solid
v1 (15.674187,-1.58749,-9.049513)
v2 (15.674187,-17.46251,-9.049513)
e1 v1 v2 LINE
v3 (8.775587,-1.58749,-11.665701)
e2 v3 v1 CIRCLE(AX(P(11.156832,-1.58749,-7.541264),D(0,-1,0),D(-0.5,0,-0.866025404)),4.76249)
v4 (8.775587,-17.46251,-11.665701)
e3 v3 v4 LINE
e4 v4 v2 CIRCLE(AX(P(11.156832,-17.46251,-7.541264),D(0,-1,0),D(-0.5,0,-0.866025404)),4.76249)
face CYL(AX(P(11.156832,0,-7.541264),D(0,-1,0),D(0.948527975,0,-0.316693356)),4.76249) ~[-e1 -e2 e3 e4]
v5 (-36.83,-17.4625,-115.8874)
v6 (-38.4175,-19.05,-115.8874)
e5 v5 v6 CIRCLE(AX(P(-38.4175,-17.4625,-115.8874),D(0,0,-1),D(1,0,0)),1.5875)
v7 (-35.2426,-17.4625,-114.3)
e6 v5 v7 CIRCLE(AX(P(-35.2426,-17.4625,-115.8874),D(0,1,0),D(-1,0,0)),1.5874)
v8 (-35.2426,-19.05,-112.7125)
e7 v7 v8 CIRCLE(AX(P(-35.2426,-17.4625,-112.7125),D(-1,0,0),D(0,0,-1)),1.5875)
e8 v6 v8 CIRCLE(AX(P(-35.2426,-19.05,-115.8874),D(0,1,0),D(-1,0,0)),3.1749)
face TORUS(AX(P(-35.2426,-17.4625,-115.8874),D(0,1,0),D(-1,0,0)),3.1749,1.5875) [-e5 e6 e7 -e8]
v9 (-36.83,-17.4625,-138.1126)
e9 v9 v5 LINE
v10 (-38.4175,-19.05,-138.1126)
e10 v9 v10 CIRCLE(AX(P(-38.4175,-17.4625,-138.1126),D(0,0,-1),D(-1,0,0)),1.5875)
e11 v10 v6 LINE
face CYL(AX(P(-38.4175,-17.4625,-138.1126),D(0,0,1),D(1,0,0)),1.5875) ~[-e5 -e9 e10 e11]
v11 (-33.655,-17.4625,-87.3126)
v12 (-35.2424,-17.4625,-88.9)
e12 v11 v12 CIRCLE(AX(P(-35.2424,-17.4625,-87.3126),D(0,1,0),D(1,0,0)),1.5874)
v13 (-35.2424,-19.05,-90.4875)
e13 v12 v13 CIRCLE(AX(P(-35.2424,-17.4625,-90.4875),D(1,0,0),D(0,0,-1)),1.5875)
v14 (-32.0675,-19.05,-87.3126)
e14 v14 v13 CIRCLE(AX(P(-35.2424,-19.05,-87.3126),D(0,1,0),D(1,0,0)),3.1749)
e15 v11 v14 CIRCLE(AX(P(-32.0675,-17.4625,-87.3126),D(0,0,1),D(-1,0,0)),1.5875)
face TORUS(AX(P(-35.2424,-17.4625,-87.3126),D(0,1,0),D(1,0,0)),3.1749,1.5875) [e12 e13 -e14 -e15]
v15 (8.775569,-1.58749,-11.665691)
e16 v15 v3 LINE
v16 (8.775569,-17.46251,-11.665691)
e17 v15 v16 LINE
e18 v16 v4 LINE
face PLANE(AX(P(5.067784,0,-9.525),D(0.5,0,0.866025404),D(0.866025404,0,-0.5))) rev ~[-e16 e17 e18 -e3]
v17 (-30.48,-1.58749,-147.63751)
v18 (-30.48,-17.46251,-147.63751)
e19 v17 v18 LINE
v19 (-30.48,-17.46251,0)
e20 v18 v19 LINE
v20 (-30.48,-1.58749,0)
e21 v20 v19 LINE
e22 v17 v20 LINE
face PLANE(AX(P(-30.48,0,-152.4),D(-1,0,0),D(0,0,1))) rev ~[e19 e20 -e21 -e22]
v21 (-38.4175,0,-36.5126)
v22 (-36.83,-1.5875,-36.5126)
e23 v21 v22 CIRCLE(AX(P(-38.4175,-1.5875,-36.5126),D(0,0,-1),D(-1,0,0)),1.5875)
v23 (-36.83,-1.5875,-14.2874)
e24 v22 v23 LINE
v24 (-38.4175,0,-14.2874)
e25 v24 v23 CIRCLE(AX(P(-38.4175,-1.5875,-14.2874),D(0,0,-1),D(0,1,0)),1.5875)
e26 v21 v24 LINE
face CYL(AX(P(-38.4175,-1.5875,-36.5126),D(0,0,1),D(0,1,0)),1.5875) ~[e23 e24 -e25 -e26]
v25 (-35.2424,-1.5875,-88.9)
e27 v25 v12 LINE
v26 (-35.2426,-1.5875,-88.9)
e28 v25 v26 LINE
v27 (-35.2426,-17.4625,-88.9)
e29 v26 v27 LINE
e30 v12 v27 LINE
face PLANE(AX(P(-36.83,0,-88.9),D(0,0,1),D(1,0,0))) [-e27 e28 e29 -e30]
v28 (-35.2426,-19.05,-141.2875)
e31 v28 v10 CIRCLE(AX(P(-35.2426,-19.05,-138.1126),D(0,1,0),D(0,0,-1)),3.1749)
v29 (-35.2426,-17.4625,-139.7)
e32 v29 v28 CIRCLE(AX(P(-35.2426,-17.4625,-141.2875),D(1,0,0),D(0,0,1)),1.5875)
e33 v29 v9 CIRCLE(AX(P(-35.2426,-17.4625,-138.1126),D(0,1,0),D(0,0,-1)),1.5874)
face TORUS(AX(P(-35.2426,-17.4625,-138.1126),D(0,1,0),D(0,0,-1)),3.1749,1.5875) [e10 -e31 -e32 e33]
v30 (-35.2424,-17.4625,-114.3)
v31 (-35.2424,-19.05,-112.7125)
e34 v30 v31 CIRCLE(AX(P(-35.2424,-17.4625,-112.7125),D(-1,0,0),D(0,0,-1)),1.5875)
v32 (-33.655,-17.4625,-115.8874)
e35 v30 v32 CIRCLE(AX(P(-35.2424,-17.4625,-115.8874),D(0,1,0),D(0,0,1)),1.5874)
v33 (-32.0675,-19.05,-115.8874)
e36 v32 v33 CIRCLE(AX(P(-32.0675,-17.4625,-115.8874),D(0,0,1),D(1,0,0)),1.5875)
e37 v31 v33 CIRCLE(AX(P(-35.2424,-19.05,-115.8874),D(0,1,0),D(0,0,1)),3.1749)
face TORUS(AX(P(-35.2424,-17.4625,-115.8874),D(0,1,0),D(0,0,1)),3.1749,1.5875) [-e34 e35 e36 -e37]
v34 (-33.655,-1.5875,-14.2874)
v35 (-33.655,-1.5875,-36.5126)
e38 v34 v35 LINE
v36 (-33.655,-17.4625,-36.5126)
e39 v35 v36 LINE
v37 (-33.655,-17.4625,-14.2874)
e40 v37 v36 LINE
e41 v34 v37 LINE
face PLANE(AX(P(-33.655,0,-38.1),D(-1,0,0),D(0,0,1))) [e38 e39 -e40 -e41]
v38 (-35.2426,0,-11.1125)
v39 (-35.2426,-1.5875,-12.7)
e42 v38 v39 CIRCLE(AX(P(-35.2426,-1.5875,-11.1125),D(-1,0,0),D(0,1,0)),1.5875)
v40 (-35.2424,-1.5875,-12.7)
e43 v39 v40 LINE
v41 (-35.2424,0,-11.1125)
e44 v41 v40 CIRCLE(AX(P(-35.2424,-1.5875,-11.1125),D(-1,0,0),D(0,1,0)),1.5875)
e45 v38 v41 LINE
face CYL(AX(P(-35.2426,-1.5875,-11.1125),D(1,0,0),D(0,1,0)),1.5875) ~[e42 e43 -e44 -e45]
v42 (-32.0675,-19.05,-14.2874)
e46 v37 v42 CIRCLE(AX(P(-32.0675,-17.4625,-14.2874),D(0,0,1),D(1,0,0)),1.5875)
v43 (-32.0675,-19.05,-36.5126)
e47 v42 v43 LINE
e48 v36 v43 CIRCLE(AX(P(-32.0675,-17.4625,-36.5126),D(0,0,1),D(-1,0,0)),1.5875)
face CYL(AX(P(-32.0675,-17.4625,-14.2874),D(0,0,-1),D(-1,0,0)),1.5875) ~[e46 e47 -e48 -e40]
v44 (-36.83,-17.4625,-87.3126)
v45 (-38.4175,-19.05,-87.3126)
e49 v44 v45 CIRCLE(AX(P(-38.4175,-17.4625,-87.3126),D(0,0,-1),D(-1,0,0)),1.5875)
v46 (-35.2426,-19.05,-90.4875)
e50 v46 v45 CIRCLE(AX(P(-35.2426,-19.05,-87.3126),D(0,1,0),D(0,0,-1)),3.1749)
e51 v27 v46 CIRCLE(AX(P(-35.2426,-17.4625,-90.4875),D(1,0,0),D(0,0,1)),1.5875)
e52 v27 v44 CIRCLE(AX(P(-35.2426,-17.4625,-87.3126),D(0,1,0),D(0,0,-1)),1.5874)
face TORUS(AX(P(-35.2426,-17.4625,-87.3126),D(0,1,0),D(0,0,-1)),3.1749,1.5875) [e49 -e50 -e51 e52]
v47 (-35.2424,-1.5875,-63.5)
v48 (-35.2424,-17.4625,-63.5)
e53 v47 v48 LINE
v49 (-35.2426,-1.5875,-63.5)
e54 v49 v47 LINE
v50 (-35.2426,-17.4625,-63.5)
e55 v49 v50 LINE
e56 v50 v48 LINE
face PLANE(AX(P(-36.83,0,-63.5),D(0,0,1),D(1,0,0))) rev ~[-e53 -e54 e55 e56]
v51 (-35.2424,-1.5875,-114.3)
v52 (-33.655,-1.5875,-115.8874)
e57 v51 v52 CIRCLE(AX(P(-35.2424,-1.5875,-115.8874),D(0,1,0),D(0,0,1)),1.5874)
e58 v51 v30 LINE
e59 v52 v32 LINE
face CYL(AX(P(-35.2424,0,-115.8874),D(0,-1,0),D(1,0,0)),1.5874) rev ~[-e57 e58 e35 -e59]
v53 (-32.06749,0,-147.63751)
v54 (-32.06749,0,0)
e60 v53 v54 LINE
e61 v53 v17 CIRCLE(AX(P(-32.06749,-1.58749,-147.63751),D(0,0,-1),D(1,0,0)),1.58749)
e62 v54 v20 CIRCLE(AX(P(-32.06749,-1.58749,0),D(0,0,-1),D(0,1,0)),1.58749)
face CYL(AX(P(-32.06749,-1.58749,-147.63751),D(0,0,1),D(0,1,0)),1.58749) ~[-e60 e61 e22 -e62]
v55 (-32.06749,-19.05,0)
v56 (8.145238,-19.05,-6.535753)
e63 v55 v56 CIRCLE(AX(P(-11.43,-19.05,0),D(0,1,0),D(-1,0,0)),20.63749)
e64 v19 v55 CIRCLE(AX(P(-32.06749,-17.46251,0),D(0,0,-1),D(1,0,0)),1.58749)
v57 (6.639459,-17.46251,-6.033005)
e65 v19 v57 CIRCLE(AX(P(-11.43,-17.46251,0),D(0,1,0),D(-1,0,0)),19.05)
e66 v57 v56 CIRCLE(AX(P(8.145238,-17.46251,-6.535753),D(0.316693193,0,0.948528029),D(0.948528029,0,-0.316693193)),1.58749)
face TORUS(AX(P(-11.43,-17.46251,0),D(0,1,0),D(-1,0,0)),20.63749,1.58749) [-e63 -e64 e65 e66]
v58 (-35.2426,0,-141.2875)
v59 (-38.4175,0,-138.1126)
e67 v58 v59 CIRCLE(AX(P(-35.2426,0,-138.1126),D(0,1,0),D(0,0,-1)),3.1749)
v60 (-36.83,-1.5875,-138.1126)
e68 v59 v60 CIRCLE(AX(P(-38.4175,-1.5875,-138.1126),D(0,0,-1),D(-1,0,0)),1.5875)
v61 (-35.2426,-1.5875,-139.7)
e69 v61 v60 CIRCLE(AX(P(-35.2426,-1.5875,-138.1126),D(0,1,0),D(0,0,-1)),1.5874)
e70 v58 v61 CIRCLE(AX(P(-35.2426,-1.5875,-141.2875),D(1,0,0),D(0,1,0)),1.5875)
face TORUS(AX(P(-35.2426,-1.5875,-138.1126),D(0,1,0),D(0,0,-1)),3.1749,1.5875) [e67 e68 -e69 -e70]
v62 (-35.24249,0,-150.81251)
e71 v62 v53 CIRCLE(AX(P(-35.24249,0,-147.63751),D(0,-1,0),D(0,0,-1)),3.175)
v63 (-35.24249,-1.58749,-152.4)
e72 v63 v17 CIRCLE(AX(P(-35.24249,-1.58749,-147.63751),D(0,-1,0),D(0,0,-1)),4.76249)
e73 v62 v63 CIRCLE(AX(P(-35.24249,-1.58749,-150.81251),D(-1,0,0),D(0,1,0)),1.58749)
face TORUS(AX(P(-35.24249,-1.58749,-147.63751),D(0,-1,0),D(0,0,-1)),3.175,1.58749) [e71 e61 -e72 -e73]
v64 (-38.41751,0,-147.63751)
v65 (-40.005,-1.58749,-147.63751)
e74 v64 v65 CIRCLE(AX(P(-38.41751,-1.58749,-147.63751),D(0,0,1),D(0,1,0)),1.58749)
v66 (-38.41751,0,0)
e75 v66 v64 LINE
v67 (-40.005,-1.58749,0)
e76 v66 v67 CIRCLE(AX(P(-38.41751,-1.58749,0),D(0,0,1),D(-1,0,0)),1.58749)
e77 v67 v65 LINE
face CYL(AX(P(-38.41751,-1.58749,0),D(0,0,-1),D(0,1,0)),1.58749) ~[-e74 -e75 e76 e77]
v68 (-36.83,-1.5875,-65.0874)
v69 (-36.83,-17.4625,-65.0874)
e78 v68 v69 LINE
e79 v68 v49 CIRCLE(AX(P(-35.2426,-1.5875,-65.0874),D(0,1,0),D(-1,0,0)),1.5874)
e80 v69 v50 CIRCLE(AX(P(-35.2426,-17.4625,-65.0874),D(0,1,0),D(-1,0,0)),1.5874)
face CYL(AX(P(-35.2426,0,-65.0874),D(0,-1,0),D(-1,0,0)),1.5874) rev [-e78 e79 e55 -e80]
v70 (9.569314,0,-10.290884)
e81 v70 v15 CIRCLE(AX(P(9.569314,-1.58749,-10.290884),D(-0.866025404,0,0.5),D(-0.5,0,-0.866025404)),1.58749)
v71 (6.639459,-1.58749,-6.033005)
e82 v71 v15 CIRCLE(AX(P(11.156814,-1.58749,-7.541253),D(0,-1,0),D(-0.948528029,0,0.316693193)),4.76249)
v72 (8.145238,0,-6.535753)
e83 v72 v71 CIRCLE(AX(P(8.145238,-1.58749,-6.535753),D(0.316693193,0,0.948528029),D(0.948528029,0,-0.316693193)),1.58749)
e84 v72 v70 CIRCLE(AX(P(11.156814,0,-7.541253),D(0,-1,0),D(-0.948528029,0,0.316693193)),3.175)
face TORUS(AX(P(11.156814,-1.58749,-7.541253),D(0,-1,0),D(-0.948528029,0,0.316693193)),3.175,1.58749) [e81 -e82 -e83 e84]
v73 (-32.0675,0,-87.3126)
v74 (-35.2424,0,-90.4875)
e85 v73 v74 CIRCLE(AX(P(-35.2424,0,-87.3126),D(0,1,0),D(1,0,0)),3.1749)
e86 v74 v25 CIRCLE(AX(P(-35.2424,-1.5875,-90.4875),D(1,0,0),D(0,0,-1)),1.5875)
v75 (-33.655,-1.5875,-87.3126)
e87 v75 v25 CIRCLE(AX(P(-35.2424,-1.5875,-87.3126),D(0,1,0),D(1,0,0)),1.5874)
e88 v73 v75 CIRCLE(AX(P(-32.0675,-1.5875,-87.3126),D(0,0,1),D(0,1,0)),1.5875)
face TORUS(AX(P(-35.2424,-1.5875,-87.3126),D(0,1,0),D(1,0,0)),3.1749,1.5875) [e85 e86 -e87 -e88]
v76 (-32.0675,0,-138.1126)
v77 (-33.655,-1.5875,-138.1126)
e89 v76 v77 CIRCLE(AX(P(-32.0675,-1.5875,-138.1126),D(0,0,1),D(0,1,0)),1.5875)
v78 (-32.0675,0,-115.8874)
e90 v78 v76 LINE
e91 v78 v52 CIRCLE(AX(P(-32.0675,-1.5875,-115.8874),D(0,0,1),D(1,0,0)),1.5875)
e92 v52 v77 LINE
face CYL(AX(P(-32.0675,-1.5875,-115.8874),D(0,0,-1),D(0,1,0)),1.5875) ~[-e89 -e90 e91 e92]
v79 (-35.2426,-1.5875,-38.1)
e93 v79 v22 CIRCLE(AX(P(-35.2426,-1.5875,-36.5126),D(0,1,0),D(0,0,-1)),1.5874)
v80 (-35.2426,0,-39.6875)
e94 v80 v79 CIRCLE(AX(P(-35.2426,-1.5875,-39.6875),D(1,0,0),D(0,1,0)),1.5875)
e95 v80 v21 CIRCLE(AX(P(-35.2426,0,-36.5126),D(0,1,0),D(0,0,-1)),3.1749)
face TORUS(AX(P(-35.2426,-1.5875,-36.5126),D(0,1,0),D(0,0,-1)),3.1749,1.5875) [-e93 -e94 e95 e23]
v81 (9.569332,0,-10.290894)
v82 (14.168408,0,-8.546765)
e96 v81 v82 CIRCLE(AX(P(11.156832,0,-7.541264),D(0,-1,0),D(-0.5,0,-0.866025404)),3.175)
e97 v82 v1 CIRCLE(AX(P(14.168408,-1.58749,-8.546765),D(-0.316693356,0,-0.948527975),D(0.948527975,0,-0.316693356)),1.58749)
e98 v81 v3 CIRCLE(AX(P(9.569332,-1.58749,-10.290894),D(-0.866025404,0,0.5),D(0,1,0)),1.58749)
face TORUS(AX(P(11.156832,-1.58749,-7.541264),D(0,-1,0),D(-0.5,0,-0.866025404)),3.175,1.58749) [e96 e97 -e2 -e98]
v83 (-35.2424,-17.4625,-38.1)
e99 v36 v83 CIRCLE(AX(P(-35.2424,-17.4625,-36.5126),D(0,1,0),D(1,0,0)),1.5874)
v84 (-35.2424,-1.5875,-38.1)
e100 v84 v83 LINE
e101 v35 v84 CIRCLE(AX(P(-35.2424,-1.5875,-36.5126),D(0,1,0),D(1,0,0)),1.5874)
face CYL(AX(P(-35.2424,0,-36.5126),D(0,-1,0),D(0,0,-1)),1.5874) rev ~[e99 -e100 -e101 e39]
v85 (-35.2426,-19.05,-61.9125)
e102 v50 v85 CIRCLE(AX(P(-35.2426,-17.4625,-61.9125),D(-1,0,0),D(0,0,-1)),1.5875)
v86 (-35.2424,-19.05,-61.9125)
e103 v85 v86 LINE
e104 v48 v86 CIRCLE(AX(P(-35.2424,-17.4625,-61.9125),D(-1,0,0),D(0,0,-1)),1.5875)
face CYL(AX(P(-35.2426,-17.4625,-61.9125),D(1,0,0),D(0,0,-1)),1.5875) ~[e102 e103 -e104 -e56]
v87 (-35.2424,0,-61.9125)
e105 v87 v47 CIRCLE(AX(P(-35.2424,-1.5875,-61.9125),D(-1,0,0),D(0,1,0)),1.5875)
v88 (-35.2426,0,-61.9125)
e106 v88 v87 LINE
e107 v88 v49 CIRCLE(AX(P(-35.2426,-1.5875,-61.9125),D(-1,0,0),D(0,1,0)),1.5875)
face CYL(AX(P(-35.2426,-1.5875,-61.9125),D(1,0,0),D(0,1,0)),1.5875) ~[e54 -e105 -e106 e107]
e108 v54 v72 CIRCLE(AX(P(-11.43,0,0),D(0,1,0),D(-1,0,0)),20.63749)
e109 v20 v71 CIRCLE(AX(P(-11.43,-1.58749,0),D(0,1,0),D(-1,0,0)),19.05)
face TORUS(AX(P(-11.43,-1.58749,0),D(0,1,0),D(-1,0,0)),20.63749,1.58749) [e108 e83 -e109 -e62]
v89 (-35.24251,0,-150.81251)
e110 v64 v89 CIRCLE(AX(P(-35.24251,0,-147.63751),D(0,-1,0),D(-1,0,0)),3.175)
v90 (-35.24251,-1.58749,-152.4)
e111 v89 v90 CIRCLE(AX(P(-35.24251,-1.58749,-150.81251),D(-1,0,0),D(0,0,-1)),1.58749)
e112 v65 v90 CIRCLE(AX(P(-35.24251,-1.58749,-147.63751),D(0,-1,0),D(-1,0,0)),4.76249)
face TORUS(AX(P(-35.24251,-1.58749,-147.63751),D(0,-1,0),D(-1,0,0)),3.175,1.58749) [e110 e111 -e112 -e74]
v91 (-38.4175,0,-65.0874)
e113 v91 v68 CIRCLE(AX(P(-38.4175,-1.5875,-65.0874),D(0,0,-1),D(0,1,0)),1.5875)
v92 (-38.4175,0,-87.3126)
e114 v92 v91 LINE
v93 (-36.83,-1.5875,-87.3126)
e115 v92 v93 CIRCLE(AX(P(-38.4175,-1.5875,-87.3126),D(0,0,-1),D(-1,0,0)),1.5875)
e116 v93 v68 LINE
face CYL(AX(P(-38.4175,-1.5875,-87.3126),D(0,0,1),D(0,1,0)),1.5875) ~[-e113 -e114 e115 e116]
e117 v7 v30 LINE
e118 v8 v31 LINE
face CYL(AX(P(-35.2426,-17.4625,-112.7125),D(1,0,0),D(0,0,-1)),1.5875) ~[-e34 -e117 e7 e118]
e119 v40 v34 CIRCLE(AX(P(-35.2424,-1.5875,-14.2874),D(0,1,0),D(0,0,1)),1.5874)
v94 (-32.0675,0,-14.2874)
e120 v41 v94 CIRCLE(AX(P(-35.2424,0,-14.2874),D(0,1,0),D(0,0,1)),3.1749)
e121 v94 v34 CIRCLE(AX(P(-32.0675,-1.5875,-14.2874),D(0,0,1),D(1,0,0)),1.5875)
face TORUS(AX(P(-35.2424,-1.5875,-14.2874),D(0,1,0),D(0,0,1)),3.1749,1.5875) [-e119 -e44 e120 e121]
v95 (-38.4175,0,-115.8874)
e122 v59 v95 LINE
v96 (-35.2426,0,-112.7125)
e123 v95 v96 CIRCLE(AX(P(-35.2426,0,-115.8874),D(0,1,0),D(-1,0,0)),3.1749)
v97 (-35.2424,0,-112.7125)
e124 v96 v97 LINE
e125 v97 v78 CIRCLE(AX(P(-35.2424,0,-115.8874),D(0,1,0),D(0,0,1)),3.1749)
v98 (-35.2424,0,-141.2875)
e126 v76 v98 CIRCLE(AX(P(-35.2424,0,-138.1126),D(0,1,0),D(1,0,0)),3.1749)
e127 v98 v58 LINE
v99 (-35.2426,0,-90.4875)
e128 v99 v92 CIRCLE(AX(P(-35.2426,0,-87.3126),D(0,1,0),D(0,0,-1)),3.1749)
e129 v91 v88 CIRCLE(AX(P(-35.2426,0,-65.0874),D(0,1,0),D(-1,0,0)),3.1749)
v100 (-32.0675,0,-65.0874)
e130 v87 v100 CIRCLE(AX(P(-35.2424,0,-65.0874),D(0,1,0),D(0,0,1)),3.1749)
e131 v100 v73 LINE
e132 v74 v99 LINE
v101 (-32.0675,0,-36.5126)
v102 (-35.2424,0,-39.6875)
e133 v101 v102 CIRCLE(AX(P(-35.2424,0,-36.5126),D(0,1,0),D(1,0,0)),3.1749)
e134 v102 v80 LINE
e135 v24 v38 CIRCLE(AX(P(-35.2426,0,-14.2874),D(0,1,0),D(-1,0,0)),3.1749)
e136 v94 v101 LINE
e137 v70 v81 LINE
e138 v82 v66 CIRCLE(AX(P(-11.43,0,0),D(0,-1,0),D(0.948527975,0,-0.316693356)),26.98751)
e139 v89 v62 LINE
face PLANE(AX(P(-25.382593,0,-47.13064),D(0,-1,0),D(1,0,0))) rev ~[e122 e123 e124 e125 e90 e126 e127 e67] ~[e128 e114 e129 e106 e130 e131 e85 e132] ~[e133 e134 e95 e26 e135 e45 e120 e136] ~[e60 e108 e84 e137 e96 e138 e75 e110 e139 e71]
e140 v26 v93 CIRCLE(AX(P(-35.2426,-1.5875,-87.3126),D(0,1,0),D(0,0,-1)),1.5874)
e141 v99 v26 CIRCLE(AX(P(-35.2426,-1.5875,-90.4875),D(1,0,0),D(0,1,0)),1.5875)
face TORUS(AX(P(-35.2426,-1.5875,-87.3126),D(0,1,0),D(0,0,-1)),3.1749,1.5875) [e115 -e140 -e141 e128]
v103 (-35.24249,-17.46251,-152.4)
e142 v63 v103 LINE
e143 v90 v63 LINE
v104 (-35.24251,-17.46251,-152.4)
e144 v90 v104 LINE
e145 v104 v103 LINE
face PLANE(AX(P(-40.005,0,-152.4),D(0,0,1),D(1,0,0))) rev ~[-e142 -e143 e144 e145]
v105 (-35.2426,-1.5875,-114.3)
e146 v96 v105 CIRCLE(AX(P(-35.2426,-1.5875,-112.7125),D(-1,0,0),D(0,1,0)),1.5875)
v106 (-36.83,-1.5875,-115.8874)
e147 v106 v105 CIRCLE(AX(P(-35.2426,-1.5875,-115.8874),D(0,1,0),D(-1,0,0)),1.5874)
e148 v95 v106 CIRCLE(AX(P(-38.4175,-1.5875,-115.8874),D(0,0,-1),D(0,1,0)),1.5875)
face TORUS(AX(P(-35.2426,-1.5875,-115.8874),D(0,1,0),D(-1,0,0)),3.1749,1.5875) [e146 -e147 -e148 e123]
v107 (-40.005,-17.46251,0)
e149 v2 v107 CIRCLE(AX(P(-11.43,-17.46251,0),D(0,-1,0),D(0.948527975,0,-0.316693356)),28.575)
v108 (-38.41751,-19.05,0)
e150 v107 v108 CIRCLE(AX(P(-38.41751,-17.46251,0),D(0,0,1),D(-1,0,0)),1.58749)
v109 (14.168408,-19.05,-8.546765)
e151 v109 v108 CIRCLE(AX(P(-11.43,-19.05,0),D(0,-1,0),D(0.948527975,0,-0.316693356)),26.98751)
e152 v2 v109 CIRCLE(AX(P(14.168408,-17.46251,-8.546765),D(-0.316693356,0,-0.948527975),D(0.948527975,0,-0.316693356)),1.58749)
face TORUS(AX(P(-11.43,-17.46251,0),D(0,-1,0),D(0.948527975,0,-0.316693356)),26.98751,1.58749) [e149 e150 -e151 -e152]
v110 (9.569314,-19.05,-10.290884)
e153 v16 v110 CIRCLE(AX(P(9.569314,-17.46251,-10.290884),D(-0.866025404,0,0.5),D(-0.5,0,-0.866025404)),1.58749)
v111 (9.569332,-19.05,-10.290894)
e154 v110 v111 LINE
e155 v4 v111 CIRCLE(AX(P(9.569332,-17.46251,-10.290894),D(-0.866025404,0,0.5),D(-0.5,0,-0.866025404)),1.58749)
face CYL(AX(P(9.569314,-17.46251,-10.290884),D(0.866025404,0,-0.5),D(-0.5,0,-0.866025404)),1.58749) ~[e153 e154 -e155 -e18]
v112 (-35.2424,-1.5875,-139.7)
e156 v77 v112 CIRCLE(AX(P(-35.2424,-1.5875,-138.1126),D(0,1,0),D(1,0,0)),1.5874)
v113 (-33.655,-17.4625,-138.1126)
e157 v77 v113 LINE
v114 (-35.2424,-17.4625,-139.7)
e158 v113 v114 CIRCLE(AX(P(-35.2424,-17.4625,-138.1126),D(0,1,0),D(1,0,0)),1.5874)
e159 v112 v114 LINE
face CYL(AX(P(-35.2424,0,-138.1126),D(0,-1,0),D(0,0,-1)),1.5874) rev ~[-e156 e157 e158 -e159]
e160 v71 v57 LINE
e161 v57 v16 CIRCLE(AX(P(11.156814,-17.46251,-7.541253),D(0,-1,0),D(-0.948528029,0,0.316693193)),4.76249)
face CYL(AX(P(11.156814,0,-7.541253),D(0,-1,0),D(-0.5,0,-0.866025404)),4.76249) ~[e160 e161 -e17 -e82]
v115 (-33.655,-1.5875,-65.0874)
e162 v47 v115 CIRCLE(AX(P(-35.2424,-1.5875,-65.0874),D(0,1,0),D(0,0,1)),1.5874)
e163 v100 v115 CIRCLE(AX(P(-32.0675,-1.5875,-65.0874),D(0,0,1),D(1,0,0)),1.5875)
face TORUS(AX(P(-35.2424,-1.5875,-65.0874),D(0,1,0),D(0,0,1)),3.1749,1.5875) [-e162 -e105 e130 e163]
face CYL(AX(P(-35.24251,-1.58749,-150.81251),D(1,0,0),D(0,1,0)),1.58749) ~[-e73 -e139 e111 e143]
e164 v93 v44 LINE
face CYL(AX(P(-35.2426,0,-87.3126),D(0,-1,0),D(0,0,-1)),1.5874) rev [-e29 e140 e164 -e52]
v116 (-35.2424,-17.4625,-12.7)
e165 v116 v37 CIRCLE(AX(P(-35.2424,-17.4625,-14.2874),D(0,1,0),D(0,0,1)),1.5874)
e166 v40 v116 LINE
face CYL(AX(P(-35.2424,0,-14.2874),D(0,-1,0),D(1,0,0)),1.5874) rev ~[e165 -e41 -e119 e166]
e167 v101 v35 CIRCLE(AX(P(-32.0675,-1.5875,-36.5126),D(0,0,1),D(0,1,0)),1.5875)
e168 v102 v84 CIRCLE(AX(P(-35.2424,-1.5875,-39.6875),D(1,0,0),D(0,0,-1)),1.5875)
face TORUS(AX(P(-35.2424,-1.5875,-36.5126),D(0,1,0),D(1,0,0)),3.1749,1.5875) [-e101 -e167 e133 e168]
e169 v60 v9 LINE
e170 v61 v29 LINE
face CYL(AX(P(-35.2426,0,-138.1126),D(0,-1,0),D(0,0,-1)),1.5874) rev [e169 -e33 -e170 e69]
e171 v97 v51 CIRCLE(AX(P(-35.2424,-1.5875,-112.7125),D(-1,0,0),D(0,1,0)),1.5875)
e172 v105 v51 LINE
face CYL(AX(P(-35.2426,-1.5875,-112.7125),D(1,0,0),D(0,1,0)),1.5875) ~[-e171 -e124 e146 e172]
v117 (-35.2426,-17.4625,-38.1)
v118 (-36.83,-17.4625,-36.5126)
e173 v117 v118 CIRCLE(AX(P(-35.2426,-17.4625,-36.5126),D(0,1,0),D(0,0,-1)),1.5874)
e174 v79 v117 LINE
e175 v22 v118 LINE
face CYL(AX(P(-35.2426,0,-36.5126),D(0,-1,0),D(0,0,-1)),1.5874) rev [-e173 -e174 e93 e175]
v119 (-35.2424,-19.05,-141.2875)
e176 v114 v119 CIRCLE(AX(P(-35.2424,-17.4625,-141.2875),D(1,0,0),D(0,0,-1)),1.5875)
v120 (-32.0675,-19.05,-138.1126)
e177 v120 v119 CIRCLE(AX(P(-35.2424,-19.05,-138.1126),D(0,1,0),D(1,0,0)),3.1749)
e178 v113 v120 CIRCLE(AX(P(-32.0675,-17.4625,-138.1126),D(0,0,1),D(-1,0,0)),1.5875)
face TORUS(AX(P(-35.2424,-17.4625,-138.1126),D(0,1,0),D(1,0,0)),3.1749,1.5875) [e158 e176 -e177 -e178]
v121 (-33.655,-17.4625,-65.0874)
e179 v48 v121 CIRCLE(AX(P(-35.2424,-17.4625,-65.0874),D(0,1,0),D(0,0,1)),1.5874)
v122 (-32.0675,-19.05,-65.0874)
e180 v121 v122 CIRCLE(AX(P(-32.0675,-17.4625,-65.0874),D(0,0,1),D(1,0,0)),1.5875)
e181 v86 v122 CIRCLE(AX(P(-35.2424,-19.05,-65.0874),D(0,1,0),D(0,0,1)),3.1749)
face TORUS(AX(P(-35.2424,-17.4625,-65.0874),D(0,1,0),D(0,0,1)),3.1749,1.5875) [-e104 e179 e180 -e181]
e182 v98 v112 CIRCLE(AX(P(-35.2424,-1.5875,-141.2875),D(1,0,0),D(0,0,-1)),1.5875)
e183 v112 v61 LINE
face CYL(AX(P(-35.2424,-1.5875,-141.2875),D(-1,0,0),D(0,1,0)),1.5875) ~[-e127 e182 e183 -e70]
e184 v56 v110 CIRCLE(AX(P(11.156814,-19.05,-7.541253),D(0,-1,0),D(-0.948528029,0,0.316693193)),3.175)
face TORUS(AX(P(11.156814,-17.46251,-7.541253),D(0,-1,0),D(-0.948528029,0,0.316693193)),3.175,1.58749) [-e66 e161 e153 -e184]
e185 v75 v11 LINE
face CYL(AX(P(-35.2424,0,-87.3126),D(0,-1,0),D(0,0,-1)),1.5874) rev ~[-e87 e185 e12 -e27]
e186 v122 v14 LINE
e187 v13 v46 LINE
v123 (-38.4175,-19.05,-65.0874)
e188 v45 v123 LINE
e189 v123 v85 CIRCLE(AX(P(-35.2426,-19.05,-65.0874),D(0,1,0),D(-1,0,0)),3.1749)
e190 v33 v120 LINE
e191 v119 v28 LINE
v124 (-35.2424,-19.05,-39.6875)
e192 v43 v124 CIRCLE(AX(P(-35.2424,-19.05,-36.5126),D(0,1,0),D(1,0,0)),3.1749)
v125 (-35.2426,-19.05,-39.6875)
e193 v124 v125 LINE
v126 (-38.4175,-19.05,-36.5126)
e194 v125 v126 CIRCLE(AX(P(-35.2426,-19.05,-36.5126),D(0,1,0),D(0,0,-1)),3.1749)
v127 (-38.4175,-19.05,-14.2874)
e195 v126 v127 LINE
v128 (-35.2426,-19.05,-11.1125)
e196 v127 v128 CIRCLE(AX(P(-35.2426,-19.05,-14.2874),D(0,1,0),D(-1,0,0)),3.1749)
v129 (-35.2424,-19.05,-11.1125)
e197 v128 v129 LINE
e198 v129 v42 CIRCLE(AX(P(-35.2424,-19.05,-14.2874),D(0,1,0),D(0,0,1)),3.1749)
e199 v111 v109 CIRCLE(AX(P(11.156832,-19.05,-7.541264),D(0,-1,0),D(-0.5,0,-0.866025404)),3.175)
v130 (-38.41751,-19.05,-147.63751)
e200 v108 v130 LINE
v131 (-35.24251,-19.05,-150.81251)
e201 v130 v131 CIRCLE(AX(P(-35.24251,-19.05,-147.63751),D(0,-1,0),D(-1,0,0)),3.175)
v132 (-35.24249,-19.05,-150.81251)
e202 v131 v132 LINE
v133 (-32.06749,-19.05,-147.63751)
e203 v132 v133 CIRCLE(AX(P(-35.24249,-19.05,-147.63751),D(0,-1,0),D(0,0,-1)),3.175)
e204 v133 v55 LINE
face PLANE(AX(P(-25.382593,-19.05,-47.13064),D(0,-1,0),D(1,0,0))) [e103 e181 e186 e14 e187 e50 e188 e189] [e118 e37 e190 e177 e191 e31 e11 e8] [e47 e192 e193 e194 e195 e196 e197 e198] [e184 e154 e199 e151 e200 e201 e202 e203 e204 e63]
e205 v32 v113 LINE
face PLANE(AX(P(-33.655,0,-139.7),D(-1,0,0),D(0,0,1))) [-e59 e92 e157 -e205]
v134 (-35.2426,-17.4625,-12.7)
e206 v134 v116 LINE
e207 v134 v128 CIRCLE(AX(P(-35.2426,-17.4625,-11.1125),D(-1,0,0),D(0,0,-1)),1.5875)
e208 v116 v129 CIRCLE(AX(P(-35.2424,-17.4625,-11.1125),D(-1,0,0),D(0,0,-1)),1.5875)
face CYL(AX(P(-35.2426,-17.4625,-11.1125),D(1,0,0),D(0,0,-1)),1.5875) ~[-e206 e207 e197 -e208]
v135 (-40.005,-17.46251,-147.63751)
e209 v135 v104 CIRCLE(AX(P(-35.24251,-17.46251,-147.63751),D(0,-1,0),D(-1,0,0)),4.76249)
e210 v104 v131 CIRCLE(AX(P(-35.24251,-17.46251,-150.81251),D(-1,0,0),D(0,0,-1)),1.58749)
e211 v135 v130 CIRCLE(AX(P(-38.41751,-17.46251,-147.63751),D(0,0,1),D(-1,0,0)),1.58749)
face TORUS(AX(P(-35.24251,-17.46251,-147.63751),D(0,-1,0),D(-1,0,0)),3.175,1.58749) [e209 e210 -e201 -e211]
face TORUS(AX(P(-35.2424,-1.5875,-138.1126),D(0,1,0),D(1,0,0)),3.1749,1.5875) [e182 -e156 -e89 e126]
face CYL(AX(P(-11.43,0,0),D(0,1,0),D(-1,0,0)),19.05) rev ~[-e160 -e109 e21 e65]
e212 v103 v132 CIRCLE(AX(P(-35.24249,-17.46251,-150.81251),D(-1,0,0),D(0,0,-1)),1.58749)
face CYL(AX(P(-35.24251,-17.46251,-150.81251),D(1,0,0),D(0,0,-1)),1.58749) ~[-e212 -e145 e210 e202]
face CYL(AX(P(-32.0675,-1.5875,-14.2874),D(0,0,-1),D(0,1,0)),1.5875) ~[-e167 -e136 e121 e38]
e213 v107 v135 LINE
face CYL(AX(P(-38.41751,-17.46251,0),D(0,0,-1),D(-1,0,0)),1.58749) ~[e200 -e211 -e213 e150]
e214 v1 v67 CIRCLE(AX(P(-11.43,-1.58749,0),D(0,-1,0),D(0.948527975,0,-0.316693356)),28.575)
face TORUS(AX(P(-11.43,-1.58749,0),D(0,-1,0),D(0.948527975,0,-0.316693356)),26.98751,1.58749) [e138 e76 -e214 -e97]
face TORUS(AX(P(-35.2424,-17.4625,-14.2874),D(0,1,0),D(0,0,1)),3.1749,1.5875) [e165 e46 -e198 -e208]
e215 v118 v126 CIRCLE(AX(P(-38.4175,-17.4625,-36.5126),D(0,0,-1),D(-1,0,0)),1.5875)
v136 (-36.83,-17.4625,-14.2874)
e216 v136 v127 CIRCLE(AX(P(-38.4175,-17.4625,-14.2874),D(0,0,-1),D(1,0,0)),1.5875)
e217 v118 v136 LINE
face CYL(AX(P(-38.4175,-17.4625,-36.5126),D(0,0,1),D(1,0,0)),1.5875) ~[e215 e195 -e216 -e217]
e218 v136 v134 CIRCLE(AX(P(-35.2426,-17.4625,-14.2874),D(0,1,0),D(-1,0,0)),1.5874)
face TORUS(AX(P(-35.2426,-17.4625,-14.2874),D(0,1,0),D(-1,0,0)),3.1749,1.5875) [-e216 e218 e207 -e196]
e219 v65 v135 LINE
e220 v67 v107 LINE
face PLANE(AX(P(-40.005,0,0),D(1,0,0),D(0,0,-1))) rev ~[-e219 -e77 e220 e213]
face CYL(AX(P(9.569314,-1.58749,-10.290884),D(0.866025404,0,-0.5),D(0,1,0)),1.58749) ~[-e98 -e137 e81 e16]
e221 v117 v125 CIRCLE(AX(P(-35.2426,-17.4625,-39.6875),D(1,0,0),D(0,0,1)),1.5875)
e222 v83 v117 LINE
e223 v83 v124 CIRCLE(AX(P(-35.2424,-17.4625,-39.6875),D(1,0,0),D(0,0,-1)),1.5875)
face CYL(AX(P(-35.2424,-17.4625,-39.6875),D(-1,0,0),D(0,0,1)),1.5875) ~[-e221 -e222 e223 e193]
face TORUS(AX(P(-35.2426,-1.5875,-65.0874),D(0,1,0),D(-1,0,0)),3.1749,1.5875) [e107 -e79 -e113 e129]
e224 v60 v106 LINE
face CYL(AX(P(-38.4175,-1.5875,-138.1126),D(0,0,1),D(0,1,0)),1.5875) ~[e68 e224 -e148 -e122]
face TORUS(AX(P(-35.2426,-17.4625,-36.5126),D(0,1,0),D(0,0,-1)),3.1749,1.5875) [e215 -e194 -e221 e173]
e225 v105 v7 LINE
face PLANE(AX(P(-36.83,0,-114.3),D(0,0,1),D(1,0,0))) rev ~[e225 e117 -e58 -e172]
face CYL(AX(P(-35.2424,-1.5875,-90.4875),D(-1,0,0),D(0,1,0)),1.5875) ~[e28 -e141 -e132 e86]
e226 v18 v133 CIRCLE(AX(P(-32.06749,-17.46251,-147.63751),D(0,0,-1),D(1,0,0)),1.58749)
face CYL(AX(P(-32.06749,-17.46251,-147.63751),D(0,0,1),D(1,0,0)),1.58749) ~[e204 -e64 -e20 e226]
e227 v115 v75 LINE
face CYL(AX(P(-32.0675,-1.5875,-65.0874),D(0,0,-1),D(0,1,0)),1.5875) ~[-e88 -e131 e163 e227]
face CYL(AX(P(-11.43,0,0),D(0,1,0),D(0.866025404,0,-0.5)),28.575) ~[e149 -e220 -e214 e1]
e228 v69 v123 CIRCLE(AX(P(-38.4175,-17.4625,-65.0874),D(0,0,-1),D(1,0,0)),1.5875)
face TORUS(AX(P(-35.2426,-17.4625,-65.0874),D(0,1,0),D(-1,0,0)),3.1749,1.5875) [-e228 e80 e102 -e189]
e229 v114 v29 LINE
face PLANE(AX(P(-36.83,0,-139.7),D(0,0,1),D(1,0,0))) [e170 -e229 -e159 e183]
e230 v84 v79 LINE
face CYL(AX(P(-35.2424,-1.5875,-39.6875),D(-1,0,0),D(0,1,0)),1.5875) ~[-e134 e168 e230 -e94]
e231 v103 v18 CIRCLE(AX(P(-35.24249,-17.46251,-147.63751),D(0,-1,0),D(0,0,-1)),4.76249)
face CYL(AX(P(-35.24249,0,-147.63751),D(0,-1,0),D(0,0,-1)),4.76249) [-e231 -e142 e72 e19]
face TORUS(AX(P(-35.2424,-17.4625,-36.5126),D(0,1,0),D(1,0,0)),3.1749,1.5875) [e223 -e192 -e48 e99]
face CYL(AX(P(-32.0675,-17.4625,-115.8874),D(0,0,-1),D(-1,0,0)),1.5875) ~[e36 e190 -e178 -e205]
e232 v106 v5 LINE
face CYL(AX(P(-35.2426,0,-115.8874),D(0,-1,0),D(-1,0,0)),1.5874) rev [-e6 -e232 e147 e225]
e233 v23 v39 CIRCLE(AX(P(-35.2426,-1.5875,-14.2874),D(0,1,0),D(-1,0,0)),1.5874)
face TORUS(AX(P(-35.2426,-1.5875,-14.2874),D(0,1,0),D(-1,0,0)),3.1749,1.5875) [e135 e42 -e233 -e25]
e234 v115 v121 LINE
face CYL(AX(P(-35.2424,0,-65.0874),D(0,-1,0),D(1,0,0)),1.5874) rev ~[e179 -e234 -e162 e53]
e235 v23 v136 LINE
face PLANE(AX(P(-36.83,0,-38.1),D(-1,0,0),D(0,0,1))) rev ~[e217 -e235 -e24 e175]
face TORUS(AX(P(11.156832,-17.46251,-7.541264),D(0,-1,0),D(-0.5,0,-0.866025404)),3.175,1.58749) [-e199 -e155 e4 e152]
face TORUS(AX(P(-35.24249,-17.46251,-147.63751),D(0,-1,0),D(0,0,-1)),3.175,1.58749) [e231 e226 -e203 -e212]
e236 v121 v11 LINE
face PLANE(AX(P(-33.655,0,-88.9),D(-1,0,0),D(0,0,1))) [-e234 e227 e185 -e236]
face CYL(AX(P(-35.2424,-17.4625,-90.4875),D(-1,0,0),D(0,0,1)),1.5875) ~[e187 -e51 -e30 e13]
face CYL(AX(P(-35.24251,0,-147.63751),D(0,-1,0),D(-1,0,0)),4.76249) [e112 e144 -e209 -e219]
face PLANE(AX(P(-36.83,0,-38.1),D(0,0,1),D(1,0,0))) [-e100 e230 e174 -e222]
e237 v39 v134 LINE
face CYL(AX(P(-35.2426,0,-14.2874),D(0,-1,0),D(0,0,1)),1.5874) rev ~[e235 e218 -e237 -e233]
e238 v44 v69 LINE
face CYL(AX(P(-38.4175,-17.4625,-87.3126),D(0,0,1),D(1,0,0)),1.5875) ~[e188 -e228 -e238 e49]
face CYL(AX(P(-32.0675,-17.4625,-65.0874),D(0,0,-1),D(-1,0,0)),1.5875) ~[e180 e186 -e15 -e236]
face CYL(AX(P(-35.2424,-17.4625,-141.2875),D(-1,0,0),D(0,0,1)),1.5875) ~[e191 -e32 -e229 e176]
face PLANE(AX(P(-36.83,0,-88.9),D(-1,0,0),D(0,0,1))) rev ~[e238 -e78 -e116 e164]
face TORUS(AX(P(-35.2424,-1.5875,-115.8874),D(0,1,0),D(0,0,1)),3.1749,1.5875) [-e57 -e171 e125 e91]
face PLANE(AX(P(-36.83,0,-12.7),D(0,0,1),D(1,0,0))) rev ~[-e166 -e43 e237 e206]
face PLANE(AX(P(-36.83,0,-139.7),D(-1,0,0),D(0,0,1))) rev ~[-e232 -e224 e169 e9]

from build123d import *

# Parameters (mm, degrees)
F0_W     = 3.175
F0_H     = 25.4
F1_DEPTH = 19.05
F2_R     = 4.76249
F3_F1_R  = 1.5874
F3_F2_R  = 1.5875
F4_R     = 1.58749


# Not quite as in the source:
# - a fillet or chamfer is up to 0.001 mm smaller than in the source, because OpenCascade refuses the exact size
# - a feature names something its author has since deleted; it is built from what else it names


with BuildPart() as f1:
    # F0 (on Front) → F1 (new body)
    with BuildSketch(Plane.XZ):
        with BuildLine():
            ThreePointArc((17.145, 0), (-11.43, 28.575), (-40.005, 0))
            Line((-40.005, 0), (-40.005, -152.4))
            Line((-40.005, -152.4), (-30.48, -152.4))
            Line((-30.48, -152.4), (-30.48, 0))
            ThreePointArc((-30.48, 0), (-6.4994971908, 18.4008869908), (5.0677839421, -9.525))
            Line((5.0677839421, -9.525), (13.3166759131, -14.2875))
            ThreePointArc((13.3166759131, -14.2875), (16.1713304862, -7.3957542138), (17.145, 0))
        make_face()
        with Locations((-35.2425, -127)):
            Rectangle(F0_W, F0_H, mode=Mode.SUBTRACT)
        with Locations((-35.2425, -76.2)):
            Rectangle(F0_W, F0_H, mode=Mode.SUBTRACT)
        with Locations((-35.2425, -25.4)):
            Rectangle(F0_W, F0_H, mode=Mode.SUBTRACT)
    extrude(amount=F1_DEPTH)

    # F2 (radius 4.7625 in the source; OpenCascade refuses exactly that, so slightly less here)
    f2_edges = [f1.edges().sort_by_distance(p)[0] for p in [
        (13.316676, -9.525, -14.2875),
        (5.067784, -9.525, -9.525),
        (-30.48, -9.525, -152.4),
        (-40.005, -9.525, -152.4),
    ]]
    fillet(f2_edges, radius=F2_R)

    # F3: fillet of radius 1.5875 on 24 edges, made by hand

    # F3_f1 (radius 1.5875 in the source; OpenCascade refuses exactly that, so slightly less here)
    f3_f1_edges = [f1.edges().sort_by_distance(p)[0] for p in [
        (-36.83, -9.525, -12.7),
        (-33.655, -9.525, -12.7),
        (-36.83, -9.525, -63.5),
        (-33.655, -9.525, -63.5),
        (-36.83, -9.525, -114.3),
        (-33.655, -9.525, -114.3),
        (-33.655, -9.525, -139.7),
        (-36.83, -9.525, -139.7),
        (-33.655, -9.525, -88.9),
        (-36.83, -9.525, -88.9),
        (-33.655, -9.525, -38.1),
        (-36.83, -9.525, -38.1),
    ]]
    fillet(f3_f1_edges, radius=F3_F1_R)

    # F3_f2
    f3_f2_edges = [f1.edges().sort_by_distance(p)[0] for p in [
        (-35.2425, 0, -12.7),
        (-35.2425, -19.05, -12.7),
        (-35.2425, 0, -63.5),
        (-35.2425, -19.05, -63.5),
        (-35.2425, 0, -114.3),
        (-35.2425, -19.05, -114.3),
        (-35.2425, 0, -139.7),
        (-35.2425, -19.05, -139.7),
        (-35.2425, 0, -88.9),
        (-35.2425, -19.05, -88.9),
        (-35.2425, 0, -38.1),
        (-35.2425, -19.05, -38.1),
        (-34.1199386955, -19.05, -37.6350613045),
        (-36.3650613045, -19.05, -37.6350613045),
        (-34.1199386955, 0, -37.6350613045),
        (-36.3650613045, 0, -37.6350613045),
        (-34.1199386955, -19.05, -88.4350613045),
        (-36.3650613045, -19.05, -88.4350613045),
        (-34.1199386955, 0, -88.4350613045),
        (-36.3650613045, 0, -88.4350613045),
        (-34.1199386955, -19.05, -139.2350613045),
        (-36.3650613045, -19.05, -139.2350613045),
        (-34.1199386955, 0, -139.2350613045),
        (-36.3650613045, 0, -139.2350613045),
        (-36.3650613045, -19.05, -114.7649386955),
        (-34.1199386955, -19.05, -114.7649386955),
        (-36.3650613045, 0, -114.7649386955),
        (-34.1199386955, 0, -114.7649386955),
        (-36.3650613045, -19.05, -63.9649386955),
        (-34.1199386955, -19.05, -63.9649386955),
        (-36.3650613045, 0, -63.9649386955),
        (-34.1199386955, 0, -63.9649386955),
        (-36.3650613045, -19.05, -13.1649386955),
        (-34.1199386955, -19.05, -13.1649386955),
        (-36.3650613045, 0, -13.1649386955),
        (-34.1199386955, 0, -13.1649386955),
    ]]
    fillet(f3_f2_edges, radius=F3_F2_R)

    # F4 (radius 1.5875 in the source; OpenCascade refuses exactly that, so slightly less here)
    f4_edges = [f1.edges().sort_by_distance(p)[0] for p in [
        (-35.2425, -19.05, -11.1125),
        (-37.487593, -19.05, -12.042407),
        (-32.997407, -19.05, -12.042407),
        (-38.4175, -19.05, -25.4),
        (-32.0675, -19.05, -25.4),
        (-37.487593, -19.05, -38.757593),
        (-32.997407, -19.05, -38.757593),
        (-35.2425, -19.05, -39.6875),
        (-6.845871, -19.05, 28.2049),
        (12.845575, -19.05, -11.994292),
        (-40.005, -19.05, -73.818755),
        (8.775578, -19.05, -11.665696),
        (-38.610099, -19.05, -151.005099),
        (6.703786, -19.05, -9.229997),
        (-35.2425, -19.05, -152.4),
        (-8.373915, -19.05, 18.803267),
        (-31.874901, -19.05, -151.005099),
        (-30.48, -19.05, -73.818755),
        (-35.2425, -19.05, -61.9125),
        (-37.487593, -19.05, -62.842407),
        (-32.997407, -19.05, -62.842407),
        (-38.4175, -19.05, -76.2),
        (-32.0675, -19.05, -76.2),
        (-37.487593, -19.05, -89.557593),
        (-32.997407, -19.05, -89.557593),
        (-35.2425, -19.05, -90.4875),
        (-35.2425, -19.05, -112.7125),
        (-37.487593, -19.05, -113.642407),
        (-32.997407, -19.05, -113.642407),
        (-38.4175, -19.05, -127),
        (-32.0675, -19.05, -127),
        (-37.487593, -19.05, -140.357593),
        (-32.997407, -19.05, -140.357593),
        (-35.2425, -19.05, -141.2875),
        (-35.2425, 0, -11.1125),
        (-37.487593, 0, -12.042407),
        (-32.997407, 0, -12.042407),
        (-38.4175, 0, -25.4),
        (-32.0675, 0, -25.4),
        (-37.487593, 0, -38.757593),
        (-32.997407, 0, -38.757593),
        (-35.2425, 0, -39.6875),
        (-6.845871, 0, 28.2049),
        (12.845575, 0, -11.994292),
        (-40.005, 0, -73.818755),
        (8.775578, 0, -11.665696),
        (-38.610099, 0, -151.005099),
        (6.703786, 0, -9.229997),
        (-35.2425, 0, -152.4),
        (-8.373915, 0, 18.803267),
        (-31.874901, 0, -151.005099),
        (-30.48, 0, -73.818755),
        (-35.2425, 0, -61.9125),
        (-37.487593, 0, -62.842407),
        (-32.997407, 0, -62.842407),
        (-38.4175, 0, -76.2),
        (-32.0675, 0, -76.2),
        (-37.487593, 0, -89.557593),
        (-32.997407, 0, -89.557593),
        (-35.2425, 0, -90.4875),
        (-35.2425, 0, -112.7125),
        (-37.487593, 0, -113.642407),
        (-32.997407, 0, -113.642407),
        (-38.4175, 0, -127),
        (-32.0675, 0, -127),
        (-37.487593, 0, -140.357593),
        (-32.997407, 0, -140.357593),
        (-35.2425, 0, -141.2875),
    ]]
    fillet(f4_edges, radius=F4_R)


solid = f1.part
